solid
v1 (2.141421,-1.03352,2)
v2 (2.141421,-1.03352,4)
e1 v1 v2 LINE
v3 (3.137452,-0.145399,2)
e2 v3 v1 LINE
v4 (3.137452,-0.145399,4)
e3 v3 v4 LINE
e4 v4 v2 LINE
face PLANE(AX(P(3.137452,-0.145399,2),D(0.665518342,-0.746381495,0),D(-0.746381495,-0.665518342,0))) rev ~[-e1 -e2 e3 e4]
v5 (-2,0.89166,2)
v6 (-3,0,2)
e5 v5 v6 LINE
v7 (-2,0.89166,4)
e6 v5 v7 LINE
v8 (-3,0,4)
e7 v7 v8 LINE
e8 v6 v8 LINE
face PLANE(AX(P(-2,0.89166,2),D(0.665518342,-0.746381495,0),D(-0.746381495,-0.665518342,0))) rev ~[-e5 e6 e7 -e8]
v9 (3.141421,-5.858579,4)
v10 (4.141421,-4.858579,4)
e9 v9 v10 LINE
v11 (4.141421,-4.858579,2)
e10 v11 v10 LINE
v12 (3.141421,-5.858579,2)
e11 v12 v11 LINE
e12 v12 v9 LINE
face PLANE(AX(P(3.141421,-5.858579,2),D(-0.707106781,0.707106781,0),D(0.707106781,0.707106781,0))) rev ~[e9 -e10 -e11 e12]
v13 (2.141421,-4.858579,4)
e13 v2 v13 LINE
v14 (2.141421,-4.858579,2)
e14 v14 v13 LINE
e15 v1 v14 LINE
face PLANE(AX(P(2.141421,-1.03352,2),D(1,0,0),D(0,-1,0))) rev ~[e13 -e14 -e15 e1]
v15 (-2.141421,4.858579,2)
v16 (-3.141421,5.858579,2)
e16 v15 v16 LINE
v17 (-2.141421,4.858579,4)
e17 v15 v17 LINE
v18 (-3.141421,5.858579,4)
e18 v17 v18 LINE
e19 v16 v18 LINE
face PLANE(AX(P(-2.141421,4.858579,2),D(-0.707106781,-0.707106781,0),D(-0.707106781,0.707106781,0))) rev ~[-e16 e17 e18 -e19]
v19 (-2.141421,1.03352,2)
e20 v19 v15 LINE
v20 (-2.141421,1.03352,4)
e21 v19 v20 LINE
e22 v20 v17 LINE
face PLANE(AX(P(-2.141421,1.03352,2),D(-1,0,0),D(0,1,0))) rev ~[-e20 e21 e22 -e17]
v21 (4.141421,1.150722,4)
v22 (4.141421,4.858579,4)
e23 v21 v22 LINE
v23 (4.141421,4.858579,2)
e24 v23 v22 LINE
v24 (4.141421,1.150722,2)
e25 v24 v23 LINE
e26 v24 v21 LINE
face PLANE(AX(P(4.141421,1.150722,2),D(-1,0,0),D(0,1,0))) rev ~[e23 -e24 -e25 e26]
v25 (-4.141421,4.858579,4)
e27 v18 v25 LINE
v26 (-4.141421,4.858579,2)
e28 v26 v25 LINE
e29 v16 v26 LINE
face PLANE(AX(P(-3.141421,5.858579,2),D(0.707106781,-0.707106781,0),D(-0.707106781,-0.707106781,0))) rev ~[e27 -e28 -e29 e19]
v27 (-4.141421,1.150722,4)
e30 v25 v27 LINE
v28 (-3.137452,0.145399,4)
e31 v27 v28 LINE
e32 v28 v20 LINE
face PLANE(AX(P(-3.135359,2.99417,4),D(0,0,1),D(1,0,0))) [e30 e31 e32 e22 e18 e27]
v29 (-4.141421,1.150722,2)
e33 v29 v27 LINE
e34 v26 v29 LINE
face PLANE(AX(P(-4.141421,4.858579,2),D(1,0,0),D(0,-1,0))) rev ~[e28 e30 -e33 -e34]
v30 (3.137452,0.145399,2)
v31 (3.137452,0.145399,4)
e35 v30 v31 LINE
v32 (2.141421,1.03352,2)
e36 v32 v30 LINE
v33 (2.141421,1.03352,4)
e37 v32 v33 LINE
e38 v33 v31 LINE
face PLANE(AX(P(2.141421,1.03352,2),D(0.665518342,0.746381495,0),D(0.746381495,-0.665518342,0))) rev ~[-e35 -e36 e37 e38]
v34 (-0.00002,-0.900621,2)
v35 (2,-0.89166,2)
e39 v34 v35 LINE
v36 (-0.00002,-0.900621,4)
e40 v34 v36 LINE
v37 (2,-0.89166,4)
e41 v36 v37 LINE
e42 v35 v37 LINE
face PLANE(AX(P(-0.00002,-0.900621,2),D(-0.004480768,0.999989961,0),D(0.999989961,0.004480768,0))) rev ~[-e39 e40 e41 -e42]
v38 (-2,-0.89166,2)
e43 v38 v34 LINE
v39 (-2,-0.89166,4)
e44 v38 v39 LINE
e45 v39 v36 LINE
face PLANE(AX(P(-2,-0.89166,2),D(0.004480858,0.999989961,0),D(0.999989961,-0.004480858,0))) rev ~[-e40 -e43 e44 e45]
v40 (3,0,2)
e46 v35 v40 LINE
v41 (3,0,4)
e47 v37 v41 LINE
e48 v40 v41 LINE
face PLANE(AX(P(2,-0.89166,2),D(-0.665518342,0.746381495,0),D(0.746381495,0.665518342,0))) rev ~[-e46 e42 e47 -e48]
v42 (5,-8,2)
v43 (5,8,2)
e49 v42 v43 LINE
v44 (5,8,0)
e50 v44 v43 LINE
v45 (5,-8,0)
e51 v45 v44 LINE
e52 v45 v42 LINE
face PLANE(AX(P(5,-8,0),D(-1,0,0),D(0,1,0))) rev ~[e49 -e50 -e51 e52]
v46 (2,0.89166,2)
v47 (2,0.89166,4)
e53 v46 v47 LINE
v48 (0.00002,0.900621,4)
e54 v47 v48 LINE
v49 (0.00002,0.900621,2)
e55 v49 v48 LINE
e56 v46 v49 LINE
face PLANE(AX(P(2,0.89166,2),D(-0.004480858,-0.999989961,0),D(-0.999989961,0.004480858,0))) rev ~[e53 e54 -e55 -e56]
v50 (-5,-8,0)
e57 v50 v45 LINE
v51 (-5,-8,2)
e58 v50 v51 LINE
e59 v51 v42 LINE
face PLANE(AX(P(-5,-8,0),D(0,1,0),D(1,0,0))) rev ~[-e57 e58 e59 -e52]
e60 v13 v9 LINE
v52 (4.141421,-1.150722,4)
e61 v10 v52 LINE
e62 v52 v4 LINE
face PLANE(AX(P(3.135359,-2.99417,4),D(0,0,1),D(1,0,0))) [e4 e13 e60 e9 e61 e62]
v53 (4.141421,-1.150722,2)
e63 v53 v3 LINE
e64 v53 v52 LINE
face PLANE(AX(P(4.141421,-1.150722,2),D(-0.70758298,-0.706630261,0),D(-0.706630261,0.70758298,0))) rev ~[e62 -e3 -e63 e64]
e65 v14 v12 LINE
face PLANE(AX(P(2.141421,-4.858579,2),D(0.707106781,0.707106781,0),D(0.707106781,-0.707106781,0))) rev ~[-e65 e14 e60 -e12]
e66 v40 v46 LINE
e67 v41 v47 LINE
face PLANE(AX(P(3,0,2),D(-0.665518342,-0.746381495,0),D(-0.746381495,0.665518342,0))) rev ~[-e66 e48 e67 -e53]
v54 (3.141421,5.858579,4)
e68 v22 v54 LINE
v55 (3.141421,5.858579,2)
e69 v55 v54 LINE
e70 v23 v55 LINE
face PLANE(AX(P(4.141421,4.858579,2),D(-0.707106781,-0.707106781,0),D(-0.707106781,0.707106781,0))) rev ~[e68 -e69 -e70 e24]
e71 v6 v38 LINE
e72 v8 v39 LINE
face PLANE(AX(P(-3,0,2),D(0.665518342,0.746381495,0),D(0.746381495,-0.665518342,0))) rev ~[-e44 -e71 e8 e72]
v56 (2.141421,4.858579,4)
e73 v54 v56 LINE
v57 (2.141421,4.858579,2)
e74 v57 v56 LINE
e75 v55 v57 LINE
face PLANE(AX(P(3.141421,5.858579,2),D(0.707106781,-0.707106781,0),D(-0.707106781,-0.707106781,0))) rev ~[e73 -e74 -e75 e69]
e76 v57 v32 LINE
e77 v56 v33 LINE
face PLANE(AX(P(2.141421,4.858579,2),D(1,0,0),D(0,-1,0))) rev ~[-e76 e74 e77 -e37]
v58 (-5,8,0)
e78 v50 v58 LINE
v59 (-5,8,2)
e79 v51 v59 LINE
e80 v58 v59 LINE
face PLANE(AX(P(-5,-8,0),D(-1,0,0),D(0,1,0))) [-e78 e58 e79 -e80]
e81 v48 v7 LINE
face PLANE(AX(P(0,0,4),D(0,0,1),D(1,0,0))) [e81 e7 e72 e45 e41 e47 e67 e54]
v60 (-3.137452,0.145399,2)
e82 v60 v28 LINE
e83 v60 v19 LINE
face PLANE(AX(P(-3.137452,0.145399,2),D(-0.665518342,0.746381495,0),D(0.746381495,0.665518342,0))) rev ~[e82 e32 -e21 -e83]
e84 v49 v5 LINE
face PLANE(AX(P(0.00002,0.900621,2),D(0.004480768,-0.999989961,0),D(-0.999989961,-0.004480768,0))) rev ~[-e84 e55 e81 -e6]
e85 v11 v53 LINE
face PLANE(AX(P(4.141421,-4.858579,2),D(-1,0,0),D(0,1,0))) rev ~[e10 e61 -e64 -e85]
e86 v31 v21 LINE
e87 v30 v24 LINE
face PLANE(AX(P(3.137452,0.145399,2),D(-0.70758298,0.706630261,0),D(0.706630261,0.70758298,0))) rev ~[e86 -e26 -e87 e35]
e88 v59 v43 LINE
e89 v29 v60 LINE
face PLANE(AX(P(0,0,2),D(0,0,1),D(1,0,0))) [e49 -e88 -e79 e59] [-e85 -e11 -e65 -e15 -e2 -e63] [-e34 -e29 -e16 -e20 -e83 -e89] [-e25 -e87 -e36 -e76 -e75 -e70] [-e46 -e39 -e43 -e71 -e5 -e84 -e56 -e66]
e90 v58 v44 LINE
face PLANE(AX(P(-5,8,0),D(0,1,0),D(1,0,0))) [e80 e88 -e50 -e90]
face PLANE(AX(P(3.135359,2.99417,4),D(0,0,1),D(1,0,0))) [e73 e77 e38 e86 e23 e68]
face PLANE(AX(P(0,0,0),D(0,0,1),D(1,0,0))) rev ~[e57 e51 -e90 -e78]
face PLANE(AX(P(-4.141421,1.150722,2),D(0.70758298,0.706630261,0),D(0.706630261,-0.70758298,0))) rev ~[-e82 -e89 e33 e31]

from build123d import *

# Parameters (mm, degrees)
F0_W     = 10
F0_H     = 16
F1_DEPTH = 2
F3_DEPTH = 2


# Not quite as in the source:
# - ends of sketch curves that miss each other by under 0.0002 mm in the source are joined


with BuildPart() as f1:
    # F0 (on Top) → F1 (new body)
    with BuildSketch(Plane.XY):
        Rectangle(F0_W, F0_H)
    extrude(amount=F1_DEPTH)

    # F2 (on face) → F3 (join)
    with BuildSketch(Plane.XY.offset(2)):
        Polygon((-2.1414213562, 4.8585786438), (-3.1414213562, 5.8585786438), (-4.1414213562, 4.8585786438), (-4.1414213562, 1.1507223826), (-3.1374518146, 0.1453992321), (-2.1414213562, 1.0335195075), align=None)
        Polygon((2, 0.891659756), (2.00782e-05, 0.9006214721), (-2, 0.891659756), (-3, 0), (-2, -0.891659756), (-2.00782e-05, -0.9006214721), (2, -0.891659756), (3, 0), align=None)
        Polygon((4.1414213562, 4.8585786438), (3.1414213562, 5.8585786438), (2.1414213562, 4.8585786438), (2.1414213562, 1.0335195075), (3.1374518146, 0.1453992321), (4.1414213562, 1.1507223826), align=None)
        Polygon((3.1374518146, -0.1453992321), (2.1414213562, -1.0335195075), (2.1414213562, -4.8585786438), (3.1414213562, -5.8585786438), (4.1414213562, -4.8585786438), (4.1414213562, -1.1507223826), align=None)
    extrude(amount=F3_DEPTH)


solid = f1.part
